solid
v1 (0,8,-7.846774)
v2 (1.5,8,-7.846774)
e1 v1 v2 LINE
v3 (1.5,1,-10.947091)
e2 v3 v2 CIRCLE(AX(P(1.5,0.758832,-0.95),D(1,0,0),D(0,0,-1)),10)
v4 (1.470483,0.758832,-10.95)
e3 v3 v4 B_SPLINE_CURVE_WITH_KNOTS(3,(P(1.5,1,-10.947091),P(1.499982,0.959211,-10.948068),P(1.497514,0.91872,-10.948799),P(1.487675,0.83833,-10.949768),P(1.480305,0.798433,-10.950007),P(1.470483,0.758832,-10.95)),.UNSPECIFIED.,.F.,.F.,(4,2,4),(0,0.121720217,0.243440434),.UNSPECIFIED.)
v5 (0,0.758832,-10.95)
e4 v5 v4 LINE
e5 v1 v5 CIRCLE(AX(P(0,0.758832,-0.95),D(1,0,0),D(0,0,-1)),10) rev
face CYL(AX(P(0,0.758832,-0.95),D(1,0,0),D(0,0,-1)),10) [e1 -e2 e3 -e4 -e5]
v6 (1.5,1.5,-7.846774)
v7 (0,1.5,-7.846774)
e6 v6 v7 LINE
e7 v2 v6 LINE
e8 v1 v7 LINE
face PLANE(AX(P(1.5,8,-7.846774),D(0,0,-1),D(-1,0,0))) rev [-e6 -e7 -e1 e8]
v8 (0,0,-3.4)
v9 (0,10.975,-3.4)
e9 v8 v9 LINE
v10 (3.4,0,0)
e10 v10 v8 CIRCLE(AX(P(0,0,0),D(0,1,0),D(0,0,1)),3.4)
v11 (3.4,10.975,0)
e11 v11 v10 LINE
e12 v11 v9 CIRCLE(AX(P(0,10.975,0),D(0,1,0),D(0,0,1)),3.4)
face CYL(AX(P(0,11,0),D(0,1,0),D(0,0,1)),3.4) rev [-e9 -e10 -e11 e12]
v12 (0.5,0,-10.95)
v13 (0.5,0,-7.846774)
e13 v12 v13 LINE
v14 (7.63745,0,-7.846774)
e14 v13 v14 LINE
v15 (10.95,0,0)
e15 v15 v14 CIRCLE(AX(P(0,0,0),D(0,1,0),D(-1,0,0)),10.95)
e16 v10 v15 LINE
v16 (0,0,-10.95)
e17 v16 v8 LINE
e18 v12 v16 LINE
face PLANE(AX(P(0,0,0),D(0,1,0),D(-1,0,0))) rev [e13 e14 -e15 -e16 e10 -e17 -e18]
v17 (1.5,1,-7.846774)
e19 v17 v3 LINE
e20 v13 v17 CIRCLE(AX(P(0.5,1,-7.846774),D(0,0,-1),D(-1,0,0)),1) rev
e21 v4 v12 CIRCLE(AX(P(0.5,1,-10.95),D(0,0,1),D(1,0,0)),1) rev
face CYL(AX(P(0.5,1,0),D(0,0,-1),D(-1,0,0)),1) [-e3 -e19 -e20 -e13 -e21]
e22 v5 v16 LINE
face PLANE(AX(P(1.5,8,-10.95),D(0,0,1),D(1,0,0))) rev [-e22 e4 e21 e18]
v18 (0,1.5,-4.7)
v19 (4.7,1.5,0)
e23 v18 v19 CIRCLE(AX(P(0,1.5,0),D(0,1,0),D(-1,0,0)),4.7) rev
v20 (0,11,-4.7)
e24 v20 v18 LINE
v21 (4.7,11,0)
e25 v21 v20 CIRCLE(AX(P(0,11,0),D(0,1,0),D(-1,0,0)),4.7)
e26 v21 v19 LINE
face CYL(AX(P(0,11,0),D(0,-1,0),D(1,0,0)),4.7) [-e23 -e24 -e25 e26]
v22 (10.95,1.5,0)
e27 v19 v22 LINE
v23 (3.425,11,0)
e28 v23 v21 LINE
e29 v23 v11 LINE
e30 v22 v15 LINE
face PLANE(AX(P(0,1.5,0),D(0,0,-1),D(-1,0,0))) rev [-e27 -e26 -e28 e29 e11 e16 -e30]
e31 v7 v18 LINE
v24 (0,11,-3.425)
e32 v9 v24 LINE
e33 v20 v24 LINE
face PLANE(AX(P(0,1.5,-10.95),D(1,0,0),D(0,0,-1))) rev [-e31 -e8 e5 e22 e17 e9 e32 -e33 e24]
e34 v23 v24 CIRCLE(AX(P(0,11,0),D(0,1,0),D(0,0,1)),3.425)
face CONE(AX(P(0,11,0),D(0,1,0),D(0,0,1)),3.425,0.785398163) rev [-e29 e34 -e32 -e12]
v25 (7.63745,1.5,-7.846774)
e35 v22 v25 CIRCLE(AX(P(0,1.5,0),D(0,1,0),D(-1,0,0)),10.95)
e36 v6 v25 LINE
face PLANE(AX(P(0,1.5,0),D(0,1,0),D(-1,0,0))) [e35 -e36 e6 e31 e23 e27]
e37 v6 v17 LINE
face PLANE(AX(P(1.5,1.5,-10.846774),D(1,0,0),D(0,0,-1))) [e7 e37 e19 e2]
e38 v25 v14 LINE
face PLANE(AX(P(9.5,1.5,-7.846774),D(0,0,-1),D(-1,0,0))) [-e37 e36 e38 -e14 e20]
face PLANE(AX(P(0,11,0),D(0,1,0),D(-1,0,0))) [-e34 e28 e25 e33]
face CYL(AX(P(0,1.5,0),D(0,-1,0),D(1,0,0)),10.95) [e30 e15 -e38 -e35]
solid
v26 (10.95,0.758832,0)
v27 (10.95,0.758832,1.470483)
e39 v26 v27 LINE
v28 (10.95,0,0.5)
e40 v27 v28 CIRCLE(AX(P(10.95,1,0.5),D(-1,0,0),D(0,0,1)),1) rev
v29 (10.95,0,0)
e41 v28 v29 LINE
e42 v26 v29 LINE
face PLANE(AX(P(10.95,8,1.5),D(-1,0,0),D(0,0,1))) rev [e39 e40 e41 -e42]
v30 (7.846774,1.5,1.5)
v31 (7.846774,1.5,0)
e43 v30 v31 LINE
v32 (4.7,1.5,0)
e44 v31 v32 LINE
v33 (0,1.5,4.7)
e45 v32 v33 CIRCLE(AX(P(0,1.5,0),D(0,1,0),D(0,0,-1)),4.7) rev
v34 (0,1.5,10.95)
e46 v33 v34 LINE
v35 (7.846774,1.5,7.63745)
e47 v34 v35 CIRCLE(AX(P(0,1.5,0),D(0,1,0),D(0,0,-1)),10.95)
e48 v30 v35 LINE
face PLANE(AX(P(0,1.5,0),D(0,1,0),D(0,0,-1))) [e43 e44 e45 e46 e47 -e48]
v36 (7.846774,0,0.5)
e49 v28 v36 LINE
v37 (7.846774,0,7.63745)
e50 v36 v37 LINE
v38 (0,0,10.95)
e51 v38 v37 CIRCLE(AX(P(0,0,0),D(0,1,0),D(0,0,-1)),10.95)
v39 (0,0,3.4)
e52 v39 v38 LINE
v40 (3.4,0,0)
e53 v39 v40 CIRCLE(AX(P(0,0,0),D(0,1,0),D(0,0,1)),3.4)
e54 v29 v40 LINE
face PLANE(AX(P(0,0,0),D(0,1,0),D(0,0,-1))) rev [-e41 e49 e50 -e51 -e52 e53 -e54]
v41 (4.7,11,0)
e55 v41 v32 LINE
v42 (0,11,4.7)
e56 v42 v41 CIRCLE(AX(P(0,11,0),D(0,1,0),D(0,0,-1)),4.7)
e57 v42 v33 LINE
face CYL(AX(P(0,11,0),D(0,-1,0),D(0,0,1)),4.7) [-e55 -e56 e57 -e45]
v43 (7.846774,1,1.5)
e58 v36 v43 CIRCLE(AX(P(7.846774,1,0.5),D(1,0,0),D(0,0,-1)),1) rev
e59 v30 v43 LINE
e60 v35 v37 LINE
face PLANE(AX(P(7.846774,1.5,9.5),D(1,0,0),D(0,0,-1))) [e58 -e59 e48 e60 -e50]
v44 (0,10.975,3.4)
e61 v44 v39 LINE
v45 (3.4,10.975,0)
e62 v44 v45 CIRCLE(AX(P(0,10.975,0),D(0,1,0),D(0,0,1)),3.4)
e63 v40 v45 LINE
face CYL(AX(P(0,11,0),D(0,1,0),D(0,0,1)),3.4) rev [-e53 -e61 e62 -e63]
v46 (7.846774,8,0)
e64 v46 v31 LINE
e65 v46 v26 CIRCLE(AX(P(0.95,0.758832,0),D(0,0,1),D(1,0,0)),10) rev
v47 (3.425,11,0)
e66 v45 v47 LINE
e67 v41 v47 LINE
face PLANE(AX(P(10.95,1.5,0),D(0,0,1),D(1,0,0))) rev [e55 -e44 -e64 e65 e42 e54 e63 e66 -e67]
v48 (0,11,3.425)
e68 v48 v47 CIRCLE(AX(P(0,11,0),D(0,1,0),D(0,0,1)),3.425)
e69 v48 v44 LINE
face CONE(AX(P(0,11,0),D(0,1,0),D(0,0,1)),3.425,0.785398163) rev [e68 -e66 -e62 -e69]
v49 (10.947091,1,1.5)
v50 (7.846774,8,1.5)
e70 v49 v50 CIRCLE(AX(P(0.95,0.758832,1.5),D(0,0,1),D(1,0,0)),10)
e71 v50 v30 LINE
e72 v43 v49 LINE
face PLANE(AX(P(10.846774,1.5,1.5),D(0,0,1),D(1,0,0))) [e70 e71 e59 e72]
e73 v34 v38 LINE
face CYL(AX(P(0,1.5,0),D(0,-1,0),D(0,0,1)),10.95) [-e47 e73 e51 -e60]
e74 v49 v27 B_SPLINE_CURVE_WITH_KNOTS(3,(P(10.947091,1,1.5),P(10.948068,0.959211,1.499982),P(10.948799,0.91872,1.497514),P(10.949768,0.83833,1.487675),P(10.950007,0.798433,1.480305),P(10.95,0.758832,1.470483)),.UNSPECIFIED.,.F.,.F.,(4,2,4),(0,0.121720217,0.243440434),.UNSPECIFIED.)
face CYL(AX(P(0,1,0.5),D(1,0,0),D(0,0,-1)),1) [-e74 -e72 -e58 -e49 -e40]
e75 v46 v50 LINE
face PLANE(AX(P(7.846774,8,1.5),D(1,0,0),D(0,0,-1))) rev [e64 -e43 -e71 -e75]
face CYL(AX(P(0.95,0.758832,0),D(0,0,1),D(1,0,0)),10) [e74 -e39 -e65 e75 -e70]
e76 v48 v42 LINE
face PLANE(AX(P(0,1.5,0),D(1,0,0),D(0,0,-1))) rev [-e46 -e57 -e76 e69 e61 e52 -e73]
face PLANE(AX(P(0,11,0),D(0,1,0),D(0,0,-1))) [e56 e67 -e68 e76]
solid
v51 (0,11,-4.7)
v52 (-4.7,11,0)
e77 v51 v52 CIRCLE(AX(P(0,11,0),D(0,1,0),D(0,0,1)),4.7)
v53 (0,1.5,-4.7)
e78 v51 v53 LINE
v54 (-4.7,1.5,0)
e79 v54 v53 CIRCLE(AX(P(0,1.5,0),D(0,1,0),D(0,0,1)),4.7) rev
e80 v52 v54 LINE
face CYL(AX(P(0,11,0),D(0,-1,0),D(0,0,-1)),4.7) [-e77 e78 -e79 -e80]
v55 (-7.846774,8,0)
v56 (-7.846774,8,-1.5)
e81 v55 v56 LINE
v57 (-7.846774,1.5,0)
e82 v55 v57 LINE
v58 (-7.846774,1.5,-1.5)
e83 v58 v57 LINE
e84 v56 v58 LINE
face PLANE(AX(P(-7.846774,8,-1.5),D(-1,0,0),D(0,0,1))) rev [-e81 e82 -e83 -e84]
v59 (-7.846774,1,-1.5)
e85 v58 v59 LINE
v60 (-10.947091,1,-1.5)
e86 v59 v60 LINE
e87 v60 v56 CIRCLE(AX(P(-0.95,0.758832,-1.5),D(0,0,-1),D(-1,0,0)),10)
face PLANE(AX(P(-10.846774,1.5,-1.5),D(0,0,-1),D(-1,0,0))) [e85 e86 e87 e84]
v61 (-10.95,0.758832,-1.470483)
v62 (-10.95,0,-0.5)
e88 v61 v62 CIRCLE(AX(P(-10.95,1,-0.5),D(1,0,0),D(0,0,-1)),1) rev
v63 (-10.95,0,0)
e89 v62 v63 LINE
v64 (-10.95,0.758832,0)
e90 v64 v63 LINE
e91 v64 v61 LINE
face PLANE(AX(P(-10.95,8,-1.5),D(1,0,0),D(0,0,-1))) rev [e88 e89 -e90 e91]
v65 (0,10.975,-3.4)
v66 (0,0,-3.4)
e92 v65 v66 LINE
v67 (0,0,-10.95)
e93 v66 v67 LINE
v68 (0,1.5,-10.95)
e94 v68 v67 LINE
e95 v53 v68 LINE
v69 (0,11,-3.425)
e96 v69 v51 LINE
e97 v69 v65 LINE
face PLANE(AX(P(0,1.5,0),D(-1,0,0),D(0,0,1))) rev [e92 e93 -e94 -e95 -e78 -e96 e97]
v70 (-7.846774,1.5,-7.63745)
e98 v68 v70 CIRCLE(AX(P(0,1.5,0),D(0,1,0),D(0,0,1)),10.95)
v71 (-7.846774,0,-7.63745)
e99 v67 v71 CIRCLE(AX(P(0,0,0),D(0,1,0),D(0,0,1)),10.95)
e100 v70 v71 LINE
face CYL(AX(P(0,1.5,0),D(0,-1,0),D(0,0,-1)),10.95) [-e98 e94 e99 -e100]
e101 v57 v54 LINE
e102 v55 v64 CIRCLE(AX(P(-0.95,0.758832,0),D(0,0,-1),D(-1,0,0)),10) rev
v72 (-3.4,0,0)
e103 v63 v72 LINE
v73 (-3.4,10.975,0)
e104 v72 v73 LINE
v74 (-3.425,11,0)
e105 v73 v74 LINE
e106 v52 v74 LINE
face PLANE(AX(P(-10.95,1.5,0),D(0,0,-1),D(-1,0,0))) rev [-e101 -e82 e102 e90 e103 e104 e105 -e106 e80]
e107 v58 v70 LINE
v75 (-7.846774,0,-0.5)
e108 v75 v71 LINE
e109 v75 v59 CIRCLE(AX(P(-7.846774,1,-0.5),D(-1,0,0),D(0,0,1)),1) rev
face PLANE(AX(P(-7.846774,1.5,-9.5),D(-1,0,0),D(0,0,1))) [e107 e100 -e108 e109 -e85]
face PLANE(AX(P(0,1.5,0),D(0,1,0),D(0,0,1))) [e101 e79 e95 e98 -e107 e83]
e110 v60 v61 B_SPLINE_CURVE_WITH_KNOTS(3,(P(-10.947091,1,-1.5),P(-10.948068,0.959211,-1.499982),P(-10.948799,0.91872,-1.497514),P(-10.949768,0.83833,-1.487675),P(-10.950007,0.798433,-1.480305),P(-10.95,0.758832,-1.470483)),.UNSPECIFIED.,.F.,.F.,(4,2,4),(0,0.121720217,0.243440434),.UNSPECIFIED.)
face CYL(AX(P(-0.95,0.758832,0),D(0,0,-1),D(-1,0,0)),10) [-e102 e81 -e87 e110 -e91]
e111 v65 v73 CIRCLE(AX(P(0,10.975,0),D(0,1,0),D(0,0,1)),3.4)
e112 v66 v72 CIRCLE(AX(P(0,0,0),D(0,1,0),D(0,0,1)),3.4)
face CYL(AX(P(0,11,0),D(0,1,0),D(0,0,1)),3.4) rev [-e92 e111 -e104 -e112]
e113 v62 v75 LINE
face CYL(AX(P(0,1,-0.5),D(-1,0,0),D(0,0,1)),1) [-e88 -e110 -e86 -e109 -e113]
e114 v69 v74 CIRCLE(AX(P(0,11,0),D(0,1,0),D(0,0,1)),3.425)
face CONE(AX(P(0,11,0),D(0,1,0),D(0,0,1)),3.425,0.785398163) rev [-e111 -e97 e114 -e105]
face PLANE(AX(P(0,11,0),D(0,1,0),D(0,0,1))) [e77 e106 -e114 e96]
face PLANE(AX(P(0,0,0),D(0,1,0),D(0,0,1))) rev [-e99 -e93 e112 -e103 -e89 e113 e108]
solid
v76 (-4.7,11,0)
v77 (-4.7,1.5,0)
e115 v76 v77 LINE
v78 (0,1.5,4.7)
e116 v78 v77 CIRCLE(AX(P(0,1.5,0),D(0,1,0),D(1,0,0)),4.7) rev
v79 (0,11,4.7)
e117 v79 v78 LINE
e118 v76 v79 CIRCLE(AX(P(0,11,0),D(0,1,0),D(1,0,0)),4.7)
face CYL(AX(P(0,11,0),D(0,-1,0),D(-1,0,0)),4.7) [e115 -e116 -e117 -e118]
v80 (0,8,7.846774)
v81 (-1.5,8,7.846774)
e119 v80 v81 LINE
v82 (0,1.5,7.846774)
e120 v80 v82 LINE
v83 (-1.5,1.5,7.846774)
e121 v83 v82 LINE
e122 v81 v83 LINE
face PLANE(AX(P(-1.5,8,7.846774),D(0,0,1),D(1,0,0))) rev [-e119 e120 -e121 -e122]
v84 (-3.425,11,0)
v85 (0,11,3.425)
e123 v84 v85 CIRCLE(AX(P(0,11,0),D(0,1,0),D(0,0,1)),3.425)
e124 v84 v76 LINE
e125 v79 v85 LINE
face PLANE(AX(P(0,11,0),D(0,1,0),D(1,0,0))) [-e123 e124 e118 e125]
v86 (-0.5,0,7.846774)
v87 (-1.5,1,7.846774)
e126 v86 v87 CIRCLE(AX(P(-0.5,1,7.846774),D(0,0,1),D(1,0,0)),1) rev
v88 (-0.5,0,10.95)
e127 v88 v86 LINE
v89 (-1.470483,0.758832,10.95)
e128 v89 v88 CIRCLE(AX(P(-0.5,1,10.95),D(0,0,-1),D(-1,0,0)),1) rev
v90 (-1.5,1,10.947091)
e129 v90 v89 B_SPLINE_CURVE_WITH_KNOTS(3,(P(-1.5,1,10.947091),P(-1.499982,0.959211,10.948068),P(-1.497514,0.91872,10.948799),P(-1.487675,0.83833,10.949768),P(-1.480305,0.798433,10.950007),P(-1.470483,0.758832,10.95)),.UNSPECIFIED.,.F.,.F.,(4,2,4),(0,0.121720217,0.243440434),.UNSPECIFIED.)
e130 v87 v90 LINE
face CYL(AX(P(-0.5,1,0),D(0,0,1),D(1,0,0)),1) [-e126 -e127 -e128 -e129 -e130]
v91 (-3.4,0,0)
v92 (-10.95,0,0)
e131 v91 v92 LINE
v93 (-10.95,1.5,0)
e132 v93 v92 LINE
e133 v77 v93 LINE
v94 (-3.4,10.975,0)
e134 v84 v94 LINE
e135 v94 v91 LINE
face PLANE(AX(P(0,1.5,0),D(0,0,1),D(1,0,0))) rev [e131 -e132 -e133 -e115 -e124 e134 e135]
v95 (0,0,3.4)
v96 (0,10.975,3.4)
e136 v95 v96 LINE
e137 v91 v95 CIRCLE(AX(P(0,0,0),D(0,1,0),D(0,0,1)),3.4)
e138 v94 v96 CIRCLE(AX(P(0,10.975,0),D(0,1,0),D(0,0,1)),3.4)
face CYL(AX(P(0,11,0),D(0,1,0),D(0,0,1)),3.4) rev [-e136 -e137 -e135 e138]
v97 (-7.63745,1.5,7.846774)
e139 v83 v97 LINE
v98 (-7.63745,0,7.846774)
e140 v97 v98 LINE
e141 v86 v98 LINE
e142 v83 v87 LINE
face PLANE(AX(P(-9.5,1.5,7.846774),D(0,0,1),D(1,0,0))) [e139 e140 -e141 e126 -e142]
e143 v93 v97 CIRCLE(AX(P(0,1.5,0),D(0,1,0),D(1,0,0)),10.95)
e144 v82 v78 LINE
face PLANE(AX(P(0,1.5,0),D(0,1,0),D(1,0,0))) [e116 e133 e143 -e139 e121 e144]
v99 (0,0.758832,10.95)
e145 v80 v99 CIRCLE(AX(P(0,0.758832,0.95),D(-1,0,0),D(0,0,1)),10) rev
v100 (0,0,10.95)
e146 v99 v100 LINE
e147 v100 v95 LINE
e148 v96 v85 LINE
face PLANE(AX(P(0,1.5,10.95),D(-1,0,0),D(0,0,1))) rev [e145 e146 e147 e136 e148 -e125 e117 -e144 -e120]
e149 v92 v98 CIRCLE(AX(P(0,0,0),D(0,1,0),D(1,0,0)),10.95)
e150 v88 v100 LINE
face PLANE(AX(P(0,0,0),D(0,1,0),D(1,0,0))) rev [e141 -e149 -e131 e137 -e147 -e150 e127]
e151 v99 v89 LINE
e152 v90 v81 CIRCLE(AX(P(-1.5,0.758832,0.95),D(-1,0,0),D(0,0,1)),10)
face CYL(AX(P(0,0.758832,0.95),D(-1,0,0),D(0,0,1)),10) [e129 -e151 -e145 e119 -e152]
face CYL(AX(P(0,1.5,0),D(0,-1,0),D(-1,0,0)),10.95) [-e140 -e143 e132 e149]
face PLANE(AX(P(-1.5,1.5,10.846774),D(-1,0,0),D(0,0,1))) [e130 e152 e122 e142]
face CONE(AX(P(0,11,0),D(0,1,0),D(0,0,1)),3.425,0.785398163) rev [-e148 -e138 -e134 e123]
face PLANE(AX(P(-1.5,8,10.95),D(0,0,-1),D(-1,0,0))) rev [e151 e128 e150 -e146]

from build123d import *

# Parameters (mm, degrees)
BOSS_EXTRUDE1_DEPTH = 1.5
SKETCH2_W           = 3
SKETCH2_H           = 8
CUT_EXTRUDE1_DEPTH  = 1.5
SKETCH3_W           = 3.103226286
SKETCH3_H           = 1.5
BOSS_EXTRUDE2_DEPTH = 8
FILLET1_R           = 10
FILLET2_R           = 1
BOSS_EXTRUDE3_DEPTH = 11
CIRPATTERN1_COUNT   = 4


with BuildPart() as part:
    # Sketch1 → Boss-Extrude1 (new body)
    with BuildSketch(Plane(origin=(0, 0, 0), x_dir=(1, 0, 0), z_dir=(0, 1, 0))):
        with BuildLine():
            Line((-10.95, 0), (0, 0))
            Line((0, 0), (0, 10.95))
            ThreePointArc((0, 10.95), (-7.742819254, 7.742819254), (-10.95, 0))
        make_face()
    extrude(amount=BOSS_EXTRUDE1_DEPTH)

    # Sketch2 → Cut-Extrude1 (cut)
    with BuildSketch(Plane(origin=(0, 0, 0), x_dir=(1, 0, 0), z_dir=(0, 1, 0))):
        with Locations((-9.346773714, 5.5)):
            Rectangle(SKETCH2_W, SKETCH2_H)
    extrude(amount=CUT_EXTRUDE1_DEPTH, mode=Mode.SUBTRACT)

    # Sketch3 → Boss-Extrude2 (add)
    with BuildSketch(Plane(origin=(0, 0, 0), x_dir=(1, 0, 0), z_dir=(0, 1, 0))):
        with Locations((-9.398386857, 0.75)):
            Rectangle(SKETCH3_W, SKETCH3_H)
    extrude(amount=BOSS_EXTRUDE2_DEPTH)

    # Fillet1
    # the kernel refuses this fillet: 10 mm, written as the material it takes off along each edge
    with BuildSketch(Plane(origin=(-10.95, 8, -19.602919713), x_dir=(1, 0, 0), z_dir=(0, 0, 1))) as fillet1_piece_1:
        with BuildLine():
            CenterArc((10, -7.241167885), FILLET1_R, 133.604575442, 46.395424558)
            Line((0, -7.241167885), (-0.2, -7.241167885))
            Line((-0.2, -7.241167885), (-0.2, 0))
            Line((-0.2, 0), (0, 0.2))
            ThreePointArc((0, 0.2), (1.551613143, 0.2), (2.965290812, 0.144823358))
            Line((2.965290812, 0.144823358), (3.103226286, 0))
        make_face()
    extrude(amount=37.705839425, mode=Mode.SUBTRACT)

    # Fillet2
    fillet2_edges = [part.edges().sort_by_distance(p)[0] for p in [
        (-9.398386857, 0, -1.5),
    ]]
    fillet(fillet2_edges, radius=FILLET2_R)

    # Sketch4 → Boss-Extrude3 (add)
    with BuildSketch(Plane(origin=(0, 0, 0), x_dir=(1, 0, 0), z_dir=(0, 1, 0))):
        with BuildLine():
            Line((0, 0), (0, 4.7))
            ThreePointArc((0, 4.7), (-3.323401872, 3.323401872), (-4.7, 0))
            Line((-4.7, 0), (0, 0))
        make_face()
    extrude(amount=BOSS_EXTRUDE3_DEPTH)


with BuildPart() as cirpattern1_1:
    # CirPattern1: pattern copy
    add(part.part.rotate(Axis((0, 0, 0), (0, 1, 0)), 1 * 360 / CIRPATTERN1_COUNT))


with BuildPart() as cirpattern1_2:
    # CirPattern1: pattern copy
    add(part.part.rotate(Axis((0, 0, 0), (0, 1, 0)), 2 * 360 / CIRPATTERN1_COUNT))


with BuildPart() as cirpattern1_3:
    # CirPattern1: pattern copy
    add(part.part.rotate(Axis((0, 0, 0), (0, 1, 0)), 3 * 360 / CIRPATTERN1_COUNT))


with BuildPart() as tap_drill_for_m8_tap1_tool:
    # Sketch6 → Tap Drill for M8 Tap1 (revolve)
    with BuildSketch(Plane(origin=(0, 11, 0), x_dir=(0, 0, 1), z_dir=(1, 0, 0))):
        Polygon((0, 0), (0, 11), (3.4, 11), (3.4, 0.025), (3.425, 0), align=None)
    revolve(axis=Axis((0, 17.35, 0), (0, -1, 0)))


with BuildPart() as part_1:
    add(part.part)

    # Tap Drill for M8 Tap1: cut by tap_drill_for_m8_tap1_tool
    add(tap_drill_for_m8_tap1_tool.part, mode=Mode.SUBTRACT)


with BuildPart() as cirpattern1_1_1:
    add(cirpattern1_1.part)

    # Tap Drill for M8 Tap1: cut by tap_drill_for_m8_tap1_tool
    add(tap_drill_for_m8_tap1_tool.part, mode=Mode.SUBTRACT)


with BuildPart() as cirpattern1_2_1:
    add(cirpattern1_2.part)

    # Tap Drill for M8 Tap1: cut by tap_drill_for_m8_tap1_tool
    add(tap_drill_for_m8_tap1_tool.part, mode=Mode.SUBTRACT)


with BuildPart() as cirpattern1_3_1:
    add(cirpattern1_3.part)

    # Tap Drill for M8 Tap1: cut by tap_drill_for_m8_tap1_tool
    add(tap_drill_for_m8_tap1_tool.part, mode=Mode.SUBTRACT)


solid = Compound([part_1.part, cirpattern1_1_1.part, cirpattern1_2_1.part, cirpattern1_3_1.part])
